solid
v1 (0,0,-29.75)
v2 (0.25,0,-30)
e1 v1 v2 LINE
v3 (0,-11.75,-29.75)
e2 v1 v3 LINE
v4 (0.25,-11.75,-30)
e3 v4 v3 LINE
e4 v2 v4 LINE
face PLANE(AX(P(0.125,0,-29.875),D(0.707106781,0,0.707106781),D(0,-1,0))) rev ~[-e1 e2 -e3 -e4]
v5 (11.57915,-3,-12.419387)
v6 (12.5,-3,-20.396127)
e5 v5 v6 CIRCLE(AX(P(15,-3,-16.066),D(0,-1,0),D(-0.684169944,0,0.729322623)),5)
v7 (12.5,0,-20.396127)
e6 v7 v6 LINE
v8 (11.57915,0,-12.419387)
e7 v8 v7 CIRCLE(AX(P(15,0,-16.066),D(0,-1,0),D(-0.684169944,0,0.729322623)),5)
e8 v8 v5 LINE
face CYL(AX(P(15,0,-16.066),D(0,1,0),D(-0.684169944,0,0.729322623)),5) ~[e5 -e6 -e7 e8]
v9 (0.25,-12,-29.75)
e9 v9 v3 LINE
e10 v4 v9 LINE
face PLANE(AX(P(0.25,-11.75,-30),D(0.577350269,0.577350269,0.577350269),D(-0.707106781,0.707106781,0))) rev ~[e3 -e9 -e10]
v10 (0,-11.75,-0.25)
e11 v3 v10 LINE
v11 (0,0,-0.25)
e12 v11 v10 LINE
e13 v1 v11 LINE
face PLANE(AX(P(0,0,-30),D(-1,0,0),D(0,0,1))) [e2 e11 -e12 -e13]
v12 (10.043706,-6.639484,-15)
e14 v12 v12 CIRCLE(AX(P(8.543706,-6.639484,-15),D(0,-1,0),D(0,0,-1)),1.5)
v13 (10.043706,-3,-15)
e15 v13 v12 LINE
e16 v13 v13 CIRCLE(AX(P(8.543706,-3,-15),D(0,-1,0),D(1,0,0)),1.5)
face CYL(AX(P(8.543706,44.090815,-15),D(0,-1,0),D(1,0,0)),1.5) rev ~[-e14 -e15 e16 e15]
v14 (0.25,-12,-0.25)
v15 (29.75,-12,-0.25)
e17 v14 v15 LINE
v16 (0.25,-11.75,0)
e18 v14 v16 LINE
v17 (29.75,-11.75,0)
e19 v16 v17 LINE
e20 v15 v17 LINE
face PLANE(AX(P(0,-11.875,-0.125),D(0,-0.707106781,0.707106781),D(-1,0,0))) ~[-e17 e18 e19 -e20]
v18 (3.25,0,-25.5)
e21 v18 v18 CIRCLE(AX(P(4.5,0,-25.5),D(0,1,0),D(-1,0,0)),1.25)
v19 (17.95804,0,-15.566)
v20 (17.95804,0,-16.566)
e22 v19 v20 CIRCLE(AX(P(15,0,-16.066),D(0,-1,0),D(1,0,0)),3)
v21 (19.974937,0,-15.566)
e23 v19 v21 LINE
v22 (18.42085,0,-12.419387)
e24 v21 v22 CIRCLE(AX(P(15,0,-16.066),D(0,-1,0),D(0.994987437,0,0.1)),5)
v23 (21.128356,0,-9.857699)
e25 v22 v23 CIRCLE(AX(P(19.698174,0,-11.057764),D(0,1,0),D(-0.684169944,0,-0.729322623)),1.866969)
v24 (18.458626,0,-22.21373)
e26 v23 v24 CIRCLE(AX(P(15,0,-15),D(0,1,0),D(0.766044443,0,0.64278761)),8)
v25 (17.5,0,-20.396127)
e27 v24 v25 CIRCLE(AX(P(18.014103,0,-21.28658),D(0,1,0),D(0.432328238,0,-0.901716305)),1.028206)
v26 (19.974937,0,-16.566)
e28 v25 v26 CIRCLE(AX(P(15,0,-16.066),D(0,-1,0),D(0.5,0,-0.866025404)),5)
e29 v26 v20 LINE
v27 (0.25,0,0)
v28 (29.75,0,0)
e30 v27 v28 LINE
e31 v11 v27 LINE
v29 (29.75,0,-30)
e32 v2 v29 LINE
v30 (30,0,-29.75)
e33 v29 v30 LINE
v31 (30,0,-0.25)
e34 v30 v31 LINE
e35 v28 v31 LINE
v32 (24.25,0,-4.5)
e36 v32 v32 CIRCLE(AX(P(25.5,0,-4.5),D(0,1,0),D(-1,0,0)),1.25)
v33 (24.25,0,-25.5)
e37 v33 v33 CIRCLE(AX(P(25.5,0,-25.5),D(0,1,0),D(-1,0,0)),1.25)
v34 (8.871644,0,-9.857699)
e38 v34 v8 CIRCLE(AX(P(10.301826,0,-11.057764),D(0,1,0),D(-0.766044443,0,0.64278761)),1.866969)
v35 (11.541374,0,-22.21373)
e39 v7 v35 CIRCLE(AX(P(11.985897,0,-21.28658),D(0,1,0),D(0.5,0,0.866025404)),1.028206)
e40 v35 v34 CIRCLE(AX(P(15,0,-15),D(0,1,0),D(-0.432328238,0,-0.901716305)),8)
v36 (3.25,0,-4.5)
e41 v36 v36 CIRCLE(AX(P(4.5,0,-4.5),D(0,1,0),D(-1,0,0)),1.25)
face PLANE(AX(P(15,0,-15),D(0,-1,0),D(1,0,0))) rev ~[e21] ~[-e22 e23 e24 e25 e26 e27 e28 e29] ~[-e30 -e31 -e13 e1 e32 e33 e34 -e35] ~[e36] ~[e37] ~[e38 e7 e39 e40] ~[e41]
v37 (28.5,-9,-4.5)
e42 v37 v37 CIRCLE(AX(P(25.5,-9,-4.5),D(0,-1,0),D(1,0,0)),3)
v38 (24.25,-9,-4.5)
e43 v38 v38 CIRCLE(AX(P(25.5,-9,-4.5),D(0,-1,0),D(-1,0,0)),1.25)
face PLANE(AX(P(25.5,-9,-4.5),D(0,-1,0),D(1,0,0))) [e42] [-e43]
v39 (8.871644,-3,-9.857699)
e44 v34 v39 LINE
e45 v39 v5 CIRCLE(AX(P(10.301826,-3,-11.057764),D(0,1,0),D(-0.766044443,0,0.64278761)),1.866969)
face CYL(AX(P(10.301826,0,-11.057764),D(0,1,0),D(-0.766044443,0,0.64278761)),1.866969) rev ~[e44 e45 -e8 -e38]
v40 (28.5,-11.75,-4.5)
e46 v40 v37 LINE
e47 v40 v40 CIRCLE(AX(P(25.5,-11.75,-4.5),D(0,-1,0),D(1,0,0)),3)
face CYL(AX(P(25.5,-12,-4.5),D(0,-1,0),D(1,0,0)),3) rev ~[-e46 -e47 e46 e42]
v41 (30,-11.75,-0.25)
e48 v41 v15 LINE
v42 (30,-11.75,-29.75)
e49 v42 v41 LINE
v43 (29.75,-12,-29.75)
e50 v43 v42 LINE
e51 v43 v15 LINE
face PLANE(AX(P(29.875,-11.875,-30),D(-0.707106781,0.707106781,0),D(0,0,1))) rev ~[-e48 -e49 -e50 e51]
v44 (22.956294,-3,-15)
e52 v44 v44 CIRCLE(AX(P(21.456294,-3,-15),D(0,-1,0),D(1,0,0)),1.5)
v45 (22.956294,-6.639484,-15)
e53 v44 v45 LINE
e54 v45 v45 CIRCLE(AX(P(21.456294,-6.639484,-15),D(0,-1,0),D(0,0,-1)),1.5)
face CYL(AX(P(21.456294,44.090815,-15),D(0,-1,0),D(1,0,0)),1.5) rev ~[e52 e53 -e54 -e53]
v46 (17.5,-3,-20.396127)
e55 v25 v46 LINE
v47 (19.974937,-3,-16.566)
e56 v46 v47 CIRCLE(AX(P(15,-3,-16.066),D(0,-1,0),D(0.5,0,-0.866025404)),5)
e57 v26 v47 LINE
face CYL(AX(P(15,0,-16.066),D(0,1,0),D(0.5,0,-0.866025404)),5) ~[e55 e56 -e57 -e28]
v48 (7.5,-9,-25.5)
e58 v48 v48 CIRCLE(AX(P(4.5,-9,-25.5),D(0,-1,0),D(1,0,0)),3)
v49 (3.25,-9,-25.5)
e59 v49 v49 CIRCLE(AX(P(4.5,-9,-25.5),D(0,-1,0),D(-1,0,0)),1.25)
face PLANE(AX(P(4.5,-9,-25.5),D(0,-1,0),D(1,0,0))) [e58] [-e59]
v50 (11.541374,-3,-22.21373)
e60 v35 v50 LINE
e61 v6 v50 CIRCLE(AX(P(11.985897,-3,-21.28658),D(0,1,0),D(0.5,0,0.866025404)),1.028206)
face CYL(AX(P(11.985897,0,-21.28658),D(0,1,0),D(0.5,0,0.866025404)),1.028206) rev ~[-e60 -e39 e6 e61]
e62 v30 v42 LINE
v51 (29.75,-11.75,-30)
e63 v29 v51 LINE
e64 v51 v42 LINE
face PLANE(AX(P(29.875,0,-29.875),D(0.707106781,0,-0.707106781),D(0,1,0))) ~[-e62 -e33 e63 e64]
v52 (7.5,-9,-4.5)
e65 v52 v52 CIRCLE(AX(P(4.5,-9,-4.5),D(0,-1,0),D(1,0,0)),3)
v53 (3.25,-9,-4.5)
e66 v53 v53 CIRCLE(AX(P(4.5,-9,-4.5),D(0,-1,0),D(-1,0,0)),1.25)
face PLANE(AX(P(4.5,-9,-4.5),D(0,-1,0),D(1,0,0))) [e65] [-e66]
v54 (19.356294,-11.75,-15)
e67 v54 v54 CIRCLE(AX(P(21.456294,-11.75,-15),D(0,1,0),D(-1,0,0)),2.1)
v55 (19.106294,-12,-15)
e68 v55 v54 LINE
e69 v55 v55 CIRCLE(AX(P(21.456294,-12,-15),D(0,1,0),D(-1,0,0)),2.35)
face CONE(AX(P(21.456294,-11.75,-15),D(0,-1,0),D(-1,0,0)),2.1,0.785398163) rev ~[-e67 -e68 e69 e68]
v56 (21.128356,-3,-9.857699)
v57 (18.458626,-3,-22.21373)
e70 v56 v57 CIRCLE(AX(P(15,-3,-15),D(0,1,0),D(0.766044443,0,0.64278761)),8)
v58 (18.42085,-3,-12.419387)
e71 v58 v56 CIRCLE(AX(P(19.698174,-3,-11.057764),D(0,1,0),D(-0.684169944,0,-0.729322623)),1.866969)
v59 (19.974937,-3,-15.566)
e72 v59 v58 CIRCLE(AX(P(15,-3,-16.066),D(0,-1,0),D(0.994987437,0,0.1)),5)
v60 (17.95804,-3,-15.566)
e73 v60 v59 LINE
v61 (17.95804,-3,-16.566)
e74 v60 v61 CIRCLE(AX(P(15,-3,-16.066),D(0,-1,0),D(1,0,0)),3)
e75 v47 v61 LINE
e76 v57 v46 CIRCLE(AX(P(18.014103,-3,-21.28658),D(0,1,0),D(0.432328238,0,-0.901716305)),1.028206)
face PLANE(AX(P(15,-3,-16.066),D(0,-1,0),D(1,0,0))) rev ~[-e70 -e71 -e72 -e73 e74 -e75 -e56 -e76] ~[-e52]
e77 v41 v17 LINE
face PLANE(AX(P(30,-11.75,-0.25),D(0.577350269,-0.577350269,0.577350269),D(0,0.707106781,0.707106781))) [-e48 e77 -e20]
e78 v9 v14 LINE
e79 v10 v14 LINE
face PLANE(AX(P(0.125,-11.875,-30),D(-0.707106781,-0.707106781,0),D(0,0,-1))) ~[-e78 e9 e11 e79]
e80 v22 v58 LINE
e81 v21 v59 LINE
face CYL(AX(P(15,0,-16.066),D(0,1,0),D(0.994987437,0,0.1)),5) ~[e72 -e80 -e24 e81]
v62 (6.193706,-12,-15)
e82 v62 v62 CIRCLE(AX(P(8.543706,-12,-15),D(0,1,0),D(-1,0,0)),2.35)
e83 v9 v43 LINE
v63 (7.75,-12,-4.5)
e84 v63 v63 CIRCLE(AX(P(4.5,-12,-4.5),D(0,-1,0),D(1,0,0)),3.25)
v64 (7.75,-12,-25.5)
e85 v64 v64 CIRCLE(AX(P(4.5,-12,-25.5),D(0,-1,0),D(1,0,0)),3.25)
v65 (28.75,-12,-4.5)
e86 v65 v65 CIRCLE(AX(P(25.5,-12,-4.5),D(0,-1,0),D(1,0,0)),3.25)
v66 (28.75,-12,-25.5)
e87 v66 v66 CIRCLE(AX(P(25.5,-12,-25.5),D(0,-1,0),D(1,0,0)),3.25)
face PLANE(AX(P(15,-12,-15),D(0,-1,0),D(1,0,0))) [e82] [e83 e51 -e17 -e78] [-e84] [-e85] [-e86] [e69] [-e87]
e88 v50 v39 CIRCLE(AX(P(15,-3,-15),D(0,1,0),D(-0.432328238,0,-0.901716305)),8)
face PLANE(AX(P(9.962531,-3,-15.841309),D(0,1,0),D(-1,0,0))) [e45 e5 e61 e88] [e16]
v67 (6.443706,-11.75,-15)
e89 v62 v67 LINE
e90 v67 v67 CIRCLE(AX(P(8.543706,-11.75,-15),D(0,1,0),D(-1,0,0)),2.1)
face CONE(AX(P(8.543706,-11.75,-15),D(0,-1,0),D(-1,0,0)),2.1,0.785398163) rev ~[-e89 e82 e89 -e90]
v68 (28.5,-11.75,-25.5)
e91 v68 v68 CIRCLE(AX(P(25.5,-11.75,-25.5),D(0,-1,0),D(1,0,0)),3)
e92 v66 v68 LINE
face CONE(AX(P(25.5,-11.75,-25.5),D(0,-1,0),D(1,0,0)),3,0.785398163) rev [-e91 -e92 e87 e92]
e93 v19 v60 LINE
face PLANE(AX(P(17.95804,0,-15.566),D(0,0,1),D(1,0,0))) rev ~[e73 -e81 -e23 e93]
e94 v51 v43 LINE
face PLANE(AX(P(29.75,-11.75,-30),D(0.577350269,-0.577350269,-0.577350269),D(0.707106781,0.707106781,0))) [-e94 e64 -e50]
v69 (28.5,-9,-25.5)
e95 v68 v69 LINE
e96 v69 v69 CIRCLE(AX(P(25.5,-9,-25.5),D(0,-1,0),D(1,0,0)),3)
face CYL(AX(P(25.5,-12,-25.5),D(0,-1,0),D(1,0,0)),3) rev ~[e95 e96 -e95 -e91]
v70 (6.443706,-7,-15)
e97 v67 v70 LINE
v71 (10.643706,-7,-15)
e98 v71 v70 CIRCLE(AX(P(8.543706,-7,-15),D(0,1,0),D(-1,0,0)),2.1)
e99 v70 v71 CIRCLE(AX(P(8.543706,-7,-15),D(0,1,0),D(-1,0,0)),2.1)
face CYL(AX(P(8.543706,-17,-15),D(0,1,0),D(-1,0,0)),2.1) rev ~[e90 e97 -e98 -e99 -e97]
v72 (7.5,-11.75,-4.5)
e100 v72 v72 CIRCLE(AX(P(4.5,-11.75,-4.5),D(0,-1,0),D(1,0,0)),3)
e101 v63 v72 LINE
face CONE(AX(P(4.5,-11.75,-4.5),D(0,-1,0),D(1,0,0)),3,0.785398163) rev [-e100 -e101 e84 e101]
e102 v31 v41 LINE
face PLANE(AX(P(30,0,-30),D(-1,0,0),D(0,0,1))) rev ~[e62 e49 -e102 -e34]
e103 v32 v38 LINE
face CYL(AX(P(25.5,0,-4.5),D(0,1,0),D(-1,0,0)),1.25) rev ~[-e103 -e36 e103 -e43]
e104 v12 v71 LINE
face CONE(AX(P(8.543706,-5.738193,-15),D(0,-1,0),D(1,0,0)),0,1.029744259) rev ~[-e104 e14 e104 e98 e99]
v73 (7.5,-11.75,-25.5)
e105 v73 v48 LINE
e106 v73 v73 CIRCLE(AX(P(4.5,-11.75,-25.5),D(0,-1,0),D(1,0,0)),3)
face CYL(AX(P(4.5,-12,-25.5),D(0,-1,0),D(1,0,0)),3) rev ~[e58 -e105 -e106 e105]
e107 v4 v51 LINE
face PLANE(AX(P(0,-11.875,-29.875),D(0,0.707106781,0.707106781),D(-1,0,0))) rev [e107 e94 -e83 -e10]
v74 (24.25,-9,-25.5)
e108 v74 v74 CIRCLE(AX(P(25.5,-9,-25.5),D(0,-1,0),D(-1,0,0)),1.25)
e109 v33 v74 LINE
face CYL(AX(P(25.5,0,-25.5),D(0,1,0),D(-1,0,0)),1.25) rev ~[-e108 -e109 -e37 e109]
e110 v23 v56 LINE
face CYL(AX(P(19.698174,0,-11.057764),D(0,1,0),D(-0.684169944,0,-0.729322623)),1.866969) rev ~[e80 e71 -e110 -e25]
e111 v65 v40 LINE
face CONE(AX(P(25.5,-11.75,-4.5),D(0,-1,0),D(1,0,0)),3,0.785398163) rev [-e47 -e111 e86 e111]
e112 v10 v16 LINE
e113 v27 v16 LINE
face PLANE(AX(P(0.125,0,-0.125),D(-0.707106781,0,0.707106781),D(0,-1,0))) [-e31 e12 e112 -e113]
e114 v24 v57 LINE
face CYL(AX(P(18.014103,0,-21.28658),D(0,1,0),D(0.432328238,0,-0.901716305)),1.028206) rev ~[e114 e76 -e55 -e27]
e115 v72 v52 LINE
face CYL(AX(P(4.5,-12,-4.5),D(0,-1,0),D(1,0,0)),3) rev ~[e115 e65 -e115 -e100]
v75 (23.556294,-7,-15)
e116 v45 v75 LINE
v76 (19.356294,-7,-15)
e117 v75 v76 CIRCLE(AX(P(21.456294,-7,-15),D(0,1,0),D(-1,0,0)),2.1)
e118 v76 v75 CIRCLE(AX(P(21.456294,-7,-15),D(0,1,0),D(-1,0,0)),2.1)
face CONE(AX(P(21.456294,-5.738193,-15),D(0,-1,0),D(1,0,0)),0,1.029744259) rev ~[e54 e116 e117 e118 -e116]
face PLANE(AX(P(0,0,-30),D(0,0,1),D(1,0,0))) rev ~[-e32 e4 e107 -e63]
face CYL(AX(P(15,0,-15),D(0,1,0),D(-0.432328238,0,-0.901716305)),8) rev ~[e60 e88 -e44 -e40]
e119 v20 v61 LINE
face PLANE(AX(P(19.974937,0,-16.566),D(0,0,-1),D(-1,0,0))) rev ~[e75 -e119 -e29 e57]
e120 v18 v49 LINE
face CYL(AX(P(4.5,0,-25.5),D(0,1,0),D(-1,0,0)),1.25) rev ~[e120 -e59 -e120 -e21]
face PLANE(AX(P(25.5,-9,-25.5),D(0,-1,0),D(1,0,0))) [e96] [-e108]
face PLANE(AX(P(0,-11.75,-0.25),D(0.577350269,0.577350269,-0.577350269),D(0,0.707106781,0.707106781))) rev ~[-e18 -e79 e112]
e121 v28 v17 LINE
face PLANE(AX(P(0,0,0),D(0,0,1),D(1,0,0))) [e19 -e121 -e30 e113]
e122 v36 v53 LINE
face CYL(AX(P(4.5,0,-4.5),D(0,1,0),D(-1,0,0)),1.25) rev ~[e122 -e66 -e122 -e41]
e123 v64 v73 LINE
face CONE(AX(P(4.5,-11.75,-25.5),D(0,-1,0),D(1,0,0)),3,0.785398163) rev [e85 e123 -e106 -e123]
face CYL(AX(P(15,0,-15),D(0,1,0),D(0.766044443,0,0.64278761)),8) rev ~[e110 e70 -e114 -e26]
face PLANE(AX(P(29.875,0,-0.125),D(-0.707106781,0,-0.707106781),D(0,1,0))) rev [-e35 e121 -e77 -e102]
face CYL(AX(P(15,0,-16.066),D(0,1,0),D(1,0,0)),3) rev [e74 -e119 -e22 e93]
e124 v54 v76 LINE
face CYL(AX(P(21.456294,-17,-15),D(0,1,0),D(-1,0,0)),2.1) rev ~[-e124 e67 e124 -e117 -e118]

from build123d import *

# Parameters (mm, degrees)
F0_W      = 30
F0_H      = 30
F0_R      = 10
F0_R_2    = 3
F1_DEPTH  = 12
F2_R      = 1.25
F3_DEPTH  = 20
F4_DEPTH  = 3
F5_R      = 3
F5_R_2    = 1.25
F6_DEPTH  = 3
F8_DEPTH  = 3
F9_DEPTH  = 3
F12_D     = 3
F14_D     = 4.2
F14_DEPTH = 5
F14_TIP   = 1.2618073
F15_SIZE  = 0.25


# Not quite as in the source:
# - a feature names something its author has since deleted; it is built from what else it names


with BuildPart() as f1:
    # F0 (on Front) → F1 (new body)
    with BuildSketch(Plane.XZ):
        with Locations((15, -15)):
            Rectangle(F0_W, F0_H)
        with Locations((15, -15)):
            Circle(F0_R, mode=Mode.SUBTRACT)
        with Locations((15, -15)):
            Circle(F0_R)
        with Locations((15, -16.066)):
            Circle(F0_R_2, mode=Mode.SUBTRACT)
        with Locations((15, -16.066)):
            Circle(F0_R_2)
    extrude(amount=F1_DEPTH)

    # F2 (on face) → F3 (cut)
    with BuildSketch(Plane(origin=(0, 0, 0), x_dir=(-1, 0, 0), z_dir=(0, 1, 0))):
        with Locations((-4.5, -4.5)):
            Circle(F2_R)
        with Locations((-25.5, -4.5)):
            Circle(F2_R)
        with Locations((-25.5, -25.5)):
            Circle(F2_R)
        with Locations((-4.5, -25.5)):
            Circle(F2_R)
    extrude(amount=-F3_DEPTH, mode=Mode.SUBTRACT)

    # F0 (on Front) → F4 (cut)
    with BuildSketch(Plane.XZ):
        with Locations((15, -16.066)):
            Circle(F0_R_2)
    extrude(amount=F4_DEPTH, mode=Mode.SUBTRACT)

    # F5 (on face) → F6 (cut)
    with BuildSketch(Plane.XZ.offset(12)):
        with Locations((4.5, -4.5)):
            Circle(F5_R)
        with Locations((4.5, -4.5)):
            Circle(F5_R_2, mode=Mode.SUBTRACT)
        with Locations((25.5, -4.5)):
            Circle(F5_R)
        with Locations((25.5, -4.5)):
            Circle(F5_R_2, mode=Mode.SUBTRACT)
        with Locations((4.5, -25.5)):
            Circle(F5_R)
        with Locations((4.5, -25.5)):
            Circle(F5_R_2, mode=Mode.SUBTRACT)
        with Locations((25.5, -25.5)):
            Circle(F5_R)
        with Locations((25.5, -25.5)):
            Circle(F5_R_2, mode=Mode.SUBTRACT)
    extrude(amount=-F6_DEPTH, mode=Mode.SUBTRACT)

    # F7 (on face) → F8 (cut)
    with BuildSketch(Plane(origin=(0, 0, 0), x_dir=(-1, 0, 0), z_dir=(0, 1, 0))):
        with BuildLine():
            Line((-17.9580398915, -15.566), (-19.9749371855, -15.566))
            ThreePointArc((-19.9749371855, -15.566), (-20, -16.066), (-19.9749371855, -16.566))
            Line((-19.9749371855, -16.566), (-17.9580398915, -16.566))
            ThreePointArc((-17.9580398915, -16.566), (-18, -16.066), (-17.9580398915, -15.566))
        make_face()
    extrude(amount=-F8_DEPTH, mode=Mode.SUBTRACT)

    # F7 (on face) → F9 (cut)
    with BuildSketch(Plane(origin=(0, 0, 0), x_dir=(-1, 0, 0), z_dir=(0, 1, 0))):
        with BuildLine():
            ThreePointArc((-18.4208497185, -12.4193868859), (-18.4150519192, -9.7016030586), (-21.128355545, -9.8576991225))
            ThreePointArc((-21.128355545, -9.8576991225), (-22.8195543866, -16.6895470386), (-18.4586259046, -22.2137304394))
            ThreePointArc((-18.4586259046, -22.2137304394), (-17.1046358453, -21.7662439553), (-17.5, -20.3961270189))
            ThreePointArc((-17.5, -20.3961270189), (-19.1995404186, -18.7796433577), (-19.9749371855, -16.566))
            Line((-19.9749371855, -16.566), (-21.5030275285, -16.566))
            ThreePointArc((-21.5030275285, -16.566), (-22.0030275285, -16.066), (-21.5030275285, -15.566))
            Line((-21.5030275285, -15.566), (-19.9749371855, -15.566))
            ThreePointArc((-19.9749371855, -15.566), (-19.4830350162, -13.8518642672), (-18.4208497185, -12.4193868859))
        make_face()
        with BuildLine():
            ThreePointArc((-11.5413740954, -22.2137304394), (-7.1804456134, -16.6895470386), (-8.871644455, -9.8576991225))
            ThreePointArc((-8.871644455, -9.8576991225), (-11.5849480808, -9.7016030586), (-11.5791502815, -12.4193868859))
            ThreePointArc((-11.5791502815, -12.4193868859), (-10.0329877054, -16.6394011384), (-12.5, -20.3961270189))
            ThreePointArc((-12.5, -20.3961270189), (-12.8953641547, -21.7662439553), (-11.5413740954, -22.2137304394))
        make_face()
        with BuildLine():
            ThreePointArc((-19.9749371855, -16.566), (-20, -16.066), (-19.9749371855, -15.566))
            Line((-19.9749371855, -15.566), (-21.5030275285, -15.566))
            ThreePointArc((-21.5030275285, -15.566), (-22.0030275285, -16.066), (-21.5030275285, -16.566))
            Line((-21.5030275285, -16.566), (-19.9749371855, -16.566))
        make_face()
    extrude(amount=-F9_DEPTH, mode=Mode.SUBTRACT)

    # F12 (through all)
    with Locations(Plane(origin=(0, 0, 0), x_dir=(-1, 0, 0), z_dir=(0, 1, 0))):
        with Locations((-21.456294, -15), (-8.543706, -15)):
            Hole(F12_D / 2)

    # F14
    with Locations(Plane.XZ.offset(12)):
        with Locations((8.543706, -15), (21.456294, -15)):
            Hole(F14_D / 2, depth=F14_DEPTH)
            with Locations((0, 0, -(F14_DEPTH + F14_TIP / 2))):  # 118° drill point
                Cone(0, F14_D / 2, F14_TIP, mode=Mode.SUBTRACT)

    # F15
    f15_edges = [f1.edges().sort_by_distance(p)[0] for p in [
        (15, -12, 0),
        (30, -12, -15),
        (0, -12, -15),
        (15, -12, -30),
        (1.5, -12, -25.5),
        (22.5, -12, -25.5),
        (6.443706, -12, -15),
        (1.5, -12, -4.5),
        (19.356294, -12, -15),
        (22.5, -12, -4.5),
        (0, -6, 0),
        (30, -6, 0),
        (30, -6, -30),
        (0, -6, -30),
    ]]
    chamfer(f15_edges, length=F15_SIZE)


solid = f1.part
